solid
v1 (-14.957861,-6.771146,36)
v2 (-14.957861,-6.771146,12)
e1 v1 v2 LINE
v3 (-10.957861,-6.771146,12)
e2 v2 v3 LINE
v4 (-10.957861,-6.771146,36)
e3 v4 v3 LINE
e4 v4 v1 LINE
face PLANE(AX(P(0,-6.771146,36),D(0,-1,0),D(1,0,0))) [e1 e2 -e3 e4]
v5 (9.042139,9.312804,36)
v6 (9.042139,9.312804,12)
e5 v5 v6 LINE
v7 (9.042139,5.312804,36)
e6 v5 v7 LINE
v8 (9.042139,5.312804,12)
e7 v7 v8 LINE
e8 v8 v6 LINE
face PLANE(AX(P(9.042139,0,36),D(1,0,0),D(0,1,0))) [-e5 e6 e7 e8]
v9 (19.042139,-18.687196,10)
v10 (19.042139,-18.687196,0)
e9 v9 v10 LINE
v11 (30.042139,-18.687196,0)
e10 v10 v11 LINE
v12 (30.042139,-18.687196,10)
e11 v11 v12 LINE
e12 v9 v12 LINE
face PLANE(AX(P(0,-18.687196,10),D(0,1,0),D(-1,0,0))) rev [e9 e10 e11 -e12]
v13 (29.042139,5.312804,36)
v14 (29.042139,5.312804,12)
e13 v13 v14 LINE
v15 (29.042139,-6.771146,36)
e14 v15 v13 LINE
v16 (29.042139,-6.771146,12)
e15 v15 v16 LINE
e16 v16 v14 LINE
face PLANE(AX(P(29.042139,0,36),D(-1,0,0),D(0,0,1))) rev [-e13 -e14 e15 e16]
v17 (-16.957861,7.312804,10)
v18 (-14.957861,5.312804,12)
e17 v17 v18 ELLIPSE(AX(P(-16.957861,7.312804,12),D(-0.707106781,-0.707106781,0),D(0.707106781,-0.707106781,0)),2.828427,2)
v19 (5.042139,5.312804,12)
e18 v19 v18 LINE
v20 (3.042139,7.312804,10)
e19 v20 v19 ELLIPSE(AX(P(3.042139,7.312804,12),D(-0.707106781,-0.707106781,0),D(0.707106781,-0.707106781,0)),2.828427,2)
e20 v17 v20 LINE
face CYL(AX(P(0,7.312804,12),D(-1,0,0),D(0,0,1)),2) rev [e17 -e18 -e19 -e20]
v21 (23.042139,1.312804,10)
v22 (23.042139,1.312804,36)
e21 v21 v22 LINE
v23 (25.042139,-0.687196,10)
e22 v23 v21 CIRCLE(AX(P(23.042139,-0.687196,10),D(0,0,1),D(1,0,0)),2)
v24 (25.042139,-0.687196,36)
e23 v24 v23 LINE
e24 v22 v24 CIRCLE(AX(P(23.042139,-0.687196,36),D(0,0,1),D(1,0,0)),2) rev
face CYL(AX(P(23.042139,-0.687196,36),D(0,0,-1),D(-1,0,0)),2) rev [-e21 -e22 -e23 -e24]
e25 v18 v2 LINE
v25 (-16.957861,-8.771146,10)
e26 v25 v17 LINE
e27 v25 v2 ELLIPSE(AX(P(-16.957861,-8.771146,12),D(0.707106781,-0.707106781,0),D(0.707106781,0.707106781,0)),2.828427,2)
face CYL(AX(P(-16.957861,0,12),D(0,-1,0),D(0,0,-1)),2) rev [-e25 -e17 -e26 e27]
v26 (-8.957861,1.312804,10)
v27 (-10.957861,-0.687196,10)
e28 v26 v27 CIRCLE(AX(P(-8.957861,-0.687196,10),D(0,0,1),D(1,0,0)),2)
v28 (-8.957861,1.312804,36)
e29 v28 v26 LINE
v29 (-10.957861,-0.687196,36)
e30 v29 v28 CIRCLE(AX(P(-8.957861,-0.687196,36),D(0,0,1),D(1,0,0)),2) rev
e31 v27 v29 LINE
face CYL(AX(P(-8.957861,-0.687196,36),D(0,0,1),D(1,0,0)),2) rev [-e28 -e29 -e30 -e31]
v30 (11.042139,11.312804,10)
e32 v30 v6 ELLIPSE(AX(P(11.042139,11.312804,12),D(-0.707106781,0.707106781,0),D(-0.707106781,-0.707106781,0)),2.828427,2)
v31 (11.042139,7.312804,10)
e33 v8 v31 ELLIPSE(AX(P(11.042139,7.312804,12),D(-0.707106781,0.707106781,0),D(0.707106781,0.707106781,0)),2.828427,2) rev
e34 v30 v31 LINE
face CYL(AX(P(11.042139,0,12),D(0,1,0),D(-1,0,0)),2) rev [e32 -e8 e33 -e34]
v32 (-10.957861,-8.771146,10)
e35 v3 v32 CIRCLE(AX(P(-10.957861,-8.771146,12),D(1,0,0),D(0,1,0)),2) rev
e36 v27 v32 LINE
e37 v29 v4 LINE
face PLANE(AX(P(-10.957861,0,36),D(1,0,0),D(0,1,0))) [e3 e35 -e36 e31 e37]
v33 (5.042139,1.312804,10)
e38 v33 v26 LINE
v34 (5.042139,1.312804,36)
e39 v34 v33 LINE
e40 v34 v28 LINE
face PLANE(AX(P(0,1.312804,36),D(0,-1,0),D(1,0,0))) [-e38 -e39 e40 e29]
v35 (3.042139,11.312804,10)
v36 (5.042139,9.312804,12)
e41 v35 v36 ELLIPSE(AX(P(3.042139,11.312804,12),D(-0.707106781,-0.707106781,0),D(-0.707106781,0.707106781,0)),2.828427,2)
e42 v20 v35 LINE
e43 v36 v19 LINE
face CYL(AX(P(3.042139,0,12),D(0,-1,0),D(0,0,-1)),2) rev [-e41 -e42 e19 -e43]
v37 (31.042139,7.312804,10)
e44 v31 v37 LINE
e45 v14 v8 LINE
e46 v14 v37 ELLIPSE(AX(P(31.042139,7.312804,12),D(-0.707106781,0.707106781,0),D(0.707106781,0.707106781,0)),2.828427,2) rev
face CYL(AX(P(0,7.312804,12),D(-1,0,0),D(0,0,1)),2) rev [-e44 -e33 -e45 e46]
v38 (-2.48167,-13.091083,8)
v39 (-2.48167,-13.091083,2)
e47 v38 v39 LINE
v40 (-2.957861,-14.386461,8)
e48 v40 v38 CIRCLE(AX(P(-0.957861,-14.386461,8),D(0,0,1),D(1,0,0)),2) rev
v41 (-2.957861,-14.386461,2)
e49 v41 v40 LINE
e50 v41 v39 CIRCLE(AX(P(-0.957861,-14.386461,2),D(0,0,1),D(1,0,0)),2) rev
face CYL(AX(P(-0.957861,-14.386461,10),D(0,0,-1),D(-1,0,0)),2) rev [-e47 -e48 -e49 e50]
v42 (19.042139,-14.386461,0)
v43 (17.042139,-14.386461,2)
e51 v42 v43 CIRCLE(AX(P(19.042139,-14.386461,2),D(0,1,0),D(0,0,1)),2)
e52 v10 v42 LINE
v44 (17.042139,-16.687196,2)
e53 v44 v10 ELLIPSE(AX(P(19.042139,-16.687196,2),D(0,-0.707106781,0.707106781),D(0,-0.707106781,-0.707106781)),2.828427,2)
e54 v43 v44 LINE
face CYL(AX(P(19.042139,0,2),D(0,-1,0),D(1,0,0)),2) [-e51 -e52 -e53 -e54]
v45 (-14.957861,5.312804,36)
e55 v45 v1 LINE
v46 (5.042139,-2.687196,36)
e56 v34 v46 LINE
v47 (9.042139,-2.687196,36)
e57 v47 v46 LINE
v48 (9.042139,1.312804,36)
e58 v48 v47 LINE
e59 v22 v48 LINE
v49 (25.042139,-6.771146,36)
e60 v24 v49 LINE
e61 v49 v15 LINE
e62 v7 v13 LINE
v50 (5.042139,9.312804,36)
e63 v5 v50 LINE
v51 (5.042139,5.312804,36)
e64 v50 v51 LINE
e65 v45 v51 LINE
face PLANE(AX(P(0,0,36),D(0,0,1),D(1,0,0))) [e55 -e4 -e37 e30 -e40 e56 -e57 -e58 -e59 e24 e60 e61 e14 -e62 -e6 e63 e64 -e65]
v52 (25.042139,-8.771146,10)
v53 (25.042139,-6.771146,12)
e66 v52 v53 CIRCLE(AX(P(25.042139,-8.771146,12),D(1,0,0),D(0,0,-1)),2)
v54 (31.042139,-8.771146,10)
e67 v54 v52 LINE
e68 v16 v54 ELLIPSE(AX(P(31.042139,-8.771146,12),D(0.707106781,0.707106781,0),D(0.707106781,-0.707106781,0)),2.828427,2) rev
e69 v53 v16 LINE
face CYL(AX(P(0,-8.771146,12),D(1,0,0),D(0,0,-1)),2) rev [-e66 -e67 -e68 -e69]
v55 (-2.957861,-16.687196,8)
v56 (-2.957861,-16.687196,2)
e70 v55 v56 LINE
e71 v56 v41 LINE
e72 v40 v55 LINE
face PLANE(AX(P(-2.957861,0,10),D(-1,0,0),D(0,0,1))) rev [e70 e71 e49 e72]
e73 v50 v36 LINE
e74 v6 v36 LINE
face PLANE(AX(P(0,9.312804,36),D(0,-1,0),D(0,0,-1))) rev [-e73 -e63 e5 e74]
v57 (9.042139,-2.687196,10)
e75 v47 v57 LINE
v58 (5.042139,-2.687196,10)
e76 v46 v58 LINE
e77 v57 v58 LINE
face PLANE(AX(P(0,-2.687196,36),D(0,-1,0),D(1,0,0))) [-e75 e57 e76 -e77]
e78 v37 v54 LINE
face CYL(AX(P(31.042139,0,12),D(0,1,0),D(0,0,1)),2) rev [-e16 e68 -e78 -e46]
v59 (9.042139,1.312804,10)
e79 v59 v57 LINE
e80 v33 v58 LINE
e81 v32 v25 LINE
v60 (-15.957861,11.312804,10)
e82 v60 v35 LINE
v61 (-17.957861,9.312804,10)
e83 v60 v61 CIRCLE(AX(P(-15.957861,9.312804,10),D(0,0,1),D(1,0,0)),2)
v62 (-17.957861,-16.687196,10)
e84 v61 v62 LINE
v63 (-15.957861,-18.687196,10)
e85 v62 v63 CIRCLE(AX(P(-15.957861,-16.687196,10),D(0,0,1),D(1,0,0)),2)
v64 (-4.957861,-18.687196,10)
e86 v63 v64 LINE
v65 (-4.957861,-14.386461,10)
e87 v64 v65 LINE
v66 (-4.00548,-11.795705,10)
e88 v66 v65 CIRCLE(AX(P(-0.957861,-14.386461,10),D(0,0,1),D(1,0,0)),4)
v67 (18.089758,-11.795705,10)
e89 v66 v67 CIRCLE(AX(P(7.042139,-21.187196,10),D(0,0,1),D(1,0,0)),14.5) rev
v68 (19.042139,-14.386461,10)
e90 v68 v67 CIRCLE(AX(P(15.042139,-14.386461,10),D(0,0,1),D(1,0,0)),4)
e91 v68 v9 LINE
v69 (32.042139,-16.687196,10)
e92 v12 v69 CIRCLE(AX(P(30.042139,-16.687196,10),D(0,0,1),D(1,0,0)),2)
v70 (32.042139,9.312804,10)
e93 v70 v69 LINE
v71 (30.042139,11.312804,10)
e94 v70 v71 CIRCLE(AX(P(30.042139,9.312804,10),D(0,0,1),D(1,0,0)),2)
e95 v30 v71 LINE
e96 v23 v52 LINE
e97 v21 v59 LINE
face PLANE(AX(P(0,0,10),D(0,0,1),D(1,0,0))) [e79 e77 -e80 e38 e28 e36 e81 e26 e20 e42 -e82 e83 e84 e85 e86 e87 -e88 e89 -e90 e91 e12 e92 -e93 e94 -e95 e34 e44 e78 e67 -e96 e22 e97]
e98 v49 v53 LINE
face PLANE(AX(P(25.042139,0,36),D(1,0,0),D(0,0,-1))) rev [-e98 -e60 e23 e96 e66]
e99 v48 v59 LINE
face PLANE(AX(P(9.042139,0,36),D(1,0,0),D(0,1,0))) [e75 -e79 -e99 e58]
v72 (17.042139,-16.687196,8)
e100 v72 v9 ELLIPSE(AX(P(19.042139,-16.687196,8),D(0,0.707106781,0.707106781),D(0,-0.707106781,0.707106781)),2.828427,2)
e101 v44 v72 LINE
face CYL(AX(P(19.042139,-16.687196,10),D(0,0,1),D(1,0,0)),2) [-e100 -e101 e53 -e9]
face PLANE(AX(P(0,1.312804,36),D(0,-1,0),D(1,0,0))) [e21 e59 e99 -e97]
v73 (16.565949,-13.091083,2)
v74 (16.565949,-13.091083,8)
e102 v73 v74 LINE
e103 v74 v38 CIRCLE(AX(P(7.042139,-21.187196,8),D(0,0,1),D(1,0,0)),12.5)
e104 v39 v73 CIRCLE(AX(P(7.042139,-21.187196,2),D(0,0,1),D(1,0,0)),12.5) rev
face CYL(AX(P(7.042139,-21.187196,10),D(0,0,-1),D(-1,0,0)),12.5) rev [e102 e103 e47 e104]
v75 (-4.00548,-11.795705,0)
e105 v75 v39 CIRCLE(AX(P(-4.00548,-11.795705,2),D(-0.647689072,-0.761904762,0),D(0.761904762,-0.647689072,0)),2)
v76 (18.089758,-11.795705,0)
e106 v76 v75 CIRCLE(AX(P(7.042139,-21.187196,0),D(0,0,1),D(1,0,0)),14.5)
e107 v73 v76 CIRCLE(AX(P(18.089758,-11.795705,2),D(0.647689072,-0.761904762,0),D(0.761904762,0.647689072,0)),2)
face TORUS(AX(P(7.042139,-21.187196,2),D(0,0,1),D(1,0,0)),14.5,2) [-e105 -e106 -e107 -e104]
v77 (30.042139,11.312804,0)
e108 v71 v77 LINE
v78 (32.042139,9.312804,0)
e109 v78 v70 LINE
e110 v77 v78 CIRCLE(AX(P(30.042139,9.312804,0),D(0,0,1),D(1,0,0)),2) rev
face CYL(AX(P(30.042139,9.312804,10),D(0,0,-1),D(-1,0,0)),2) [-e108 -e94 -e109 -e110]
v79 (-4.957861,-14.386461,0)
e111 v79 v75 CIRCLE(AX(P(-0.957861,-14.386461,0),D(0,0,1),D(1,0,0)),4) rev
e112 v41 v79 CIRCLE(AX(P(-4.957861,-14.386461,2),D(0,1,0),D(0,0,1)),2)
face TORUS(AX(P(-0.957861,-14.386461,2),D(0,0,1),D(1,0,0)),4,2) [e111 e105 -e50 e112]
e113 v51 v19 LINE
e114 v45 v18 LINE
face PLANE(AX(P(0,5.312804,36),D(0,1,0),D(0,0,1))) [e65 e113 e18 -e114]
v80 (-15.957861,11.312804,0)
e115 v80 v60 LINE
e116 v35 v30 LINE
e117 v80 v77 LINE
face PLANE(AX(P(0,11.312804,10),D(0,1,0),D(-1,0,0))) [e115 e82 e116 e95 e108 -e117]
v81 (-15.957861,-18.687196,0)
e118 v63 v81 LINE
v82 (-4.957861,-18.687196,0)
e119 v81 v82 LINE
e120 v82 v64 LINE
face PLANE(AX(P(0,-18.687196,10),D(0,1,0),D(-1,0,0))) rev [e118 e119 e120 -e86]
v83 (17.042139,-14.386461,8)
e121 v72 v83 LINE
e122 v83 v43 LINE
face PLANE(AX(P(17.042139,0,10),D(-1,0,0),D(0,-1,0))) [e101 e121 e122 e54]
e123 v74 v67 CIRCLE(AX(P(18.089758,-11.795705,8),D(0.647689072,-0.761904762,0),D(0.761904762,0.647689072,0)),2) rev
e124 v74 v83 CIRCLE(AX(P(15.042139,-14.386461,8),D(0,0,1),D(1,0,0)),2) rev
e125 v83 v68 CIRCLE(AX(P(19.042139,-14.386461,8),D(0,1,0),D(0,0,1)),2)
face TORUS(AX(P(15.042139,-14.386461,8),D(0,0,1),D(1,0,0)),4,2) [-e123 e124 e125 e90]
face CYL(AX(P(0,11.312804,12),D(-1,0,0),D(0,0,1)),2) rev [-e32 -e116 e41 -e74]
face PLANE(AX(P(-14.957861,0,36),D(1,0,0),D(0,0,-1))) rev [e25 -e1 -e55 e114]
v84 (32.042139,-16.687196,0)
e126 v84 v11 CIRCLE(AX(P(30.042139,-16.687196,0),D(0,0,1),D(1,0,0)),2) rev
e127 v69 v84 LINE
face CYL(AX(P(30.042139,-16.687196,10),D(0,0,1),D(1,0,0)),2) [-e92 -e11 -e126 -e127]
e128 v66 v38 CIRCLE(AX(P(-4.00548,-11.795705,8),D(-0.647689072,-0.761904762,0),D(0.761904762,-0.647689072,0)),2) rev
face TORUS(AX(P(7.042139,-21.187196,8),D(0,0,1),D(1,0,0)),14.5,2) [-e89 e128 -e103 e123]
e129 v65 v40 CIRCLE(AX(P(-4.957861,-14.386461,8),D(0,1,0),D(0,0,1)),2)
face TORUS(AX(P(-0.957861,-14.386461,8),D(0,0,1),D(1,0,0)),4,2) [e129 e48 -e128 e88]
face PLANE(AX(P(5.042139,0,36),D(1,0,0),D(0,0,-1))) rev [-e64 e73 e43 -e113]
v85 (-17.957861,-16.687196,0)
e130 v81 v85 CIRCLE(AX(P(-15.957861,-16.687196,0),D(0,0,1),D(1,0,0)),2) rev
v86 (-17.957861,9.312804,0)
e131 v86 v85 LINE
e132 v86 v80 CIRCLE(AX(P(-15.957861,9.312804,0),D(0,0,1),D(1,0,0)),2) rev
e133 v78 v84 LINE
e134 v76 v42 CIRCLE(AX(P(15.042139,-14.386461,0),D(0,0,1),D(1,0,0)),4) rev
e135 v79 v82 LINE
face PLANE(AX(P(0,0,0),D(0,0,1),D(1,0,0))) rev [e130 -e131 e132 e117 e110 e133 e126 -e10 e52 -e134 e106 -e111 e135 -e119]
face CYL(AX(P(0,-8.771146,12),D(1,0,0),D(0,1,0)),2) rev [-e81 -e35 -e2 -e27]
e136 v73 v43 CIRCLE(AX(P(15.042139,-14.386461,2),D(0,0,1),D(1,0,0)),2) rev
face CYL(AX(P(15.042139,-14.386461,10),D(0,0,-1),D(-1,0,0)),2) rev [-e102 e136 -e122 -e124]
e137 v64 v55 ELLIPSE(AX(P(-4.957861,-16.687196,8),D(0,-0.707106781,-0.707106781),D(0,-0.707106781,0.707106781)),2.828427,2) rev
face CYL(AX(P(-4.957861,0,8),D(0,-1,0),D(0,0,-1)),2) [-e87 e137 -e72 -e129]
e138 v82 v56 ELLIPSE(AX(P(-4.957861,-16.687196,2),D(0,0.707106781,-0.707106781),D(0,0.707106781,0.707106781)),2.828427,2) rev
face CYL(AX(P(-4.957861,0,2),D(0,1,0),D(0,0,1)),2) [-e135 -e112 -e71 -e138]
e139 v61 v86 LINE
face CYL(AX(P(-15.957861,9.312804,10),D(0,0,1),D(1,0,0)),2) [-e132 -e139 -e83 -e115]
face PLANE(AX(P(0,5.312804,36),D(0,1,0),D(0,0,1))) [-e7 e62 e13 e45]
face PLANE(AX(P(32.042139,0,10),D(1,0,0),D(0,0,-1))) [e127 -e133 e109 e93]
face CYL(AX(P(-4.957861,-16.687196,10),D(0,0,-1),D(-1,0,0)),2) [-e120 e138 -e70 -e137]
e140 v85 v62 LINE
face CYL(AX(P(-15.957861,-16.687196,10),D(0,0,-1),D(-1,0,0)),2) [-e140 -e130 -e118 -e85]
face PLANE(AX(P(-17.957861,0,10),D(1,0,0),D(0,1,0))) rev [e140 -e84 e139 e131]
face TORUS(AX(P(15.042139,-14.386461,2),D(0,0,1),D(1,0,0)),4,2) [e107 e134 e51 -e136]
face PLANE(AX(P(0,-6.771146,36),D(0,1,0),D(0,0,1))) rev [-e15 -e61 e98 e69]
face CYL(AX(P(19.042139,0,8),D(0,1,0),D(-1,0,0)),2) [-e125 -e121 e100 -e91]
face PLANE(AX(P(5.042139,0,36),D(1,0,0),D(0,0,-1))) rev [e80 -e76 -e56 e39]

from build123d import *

# Parameters (mm, degrees)
RESSALTO_EXTRUS_O1_DEPTH = 10
FILETE1_R                = 2
FILETE2_R                = 2
RESSALTO_EXTRUS_O2_DEPTH = 26
FILETE4_R                = 2
FILETE6_R                = 2


with BuildPart() as part:
    # Esboço1 → Ressalto-extrusão1 (new body)
    with BuildSketch(Plane.XY):
        Polygon((-17.957860615883305, -18.6871961102107), (-2.9578606158833054, -18.687196110210696), (-2.957860615883306, -13.687196110210696), (-2.957860615883306, -8.687196110210698), (7.042139384116819, -8.687196110210696), (7.042139384116693, 11.312803889789302), (-17.95786061588331, 11.312803889789302), align=None)
        with BuildLine():
            Line((-2.957860615883306, -8.687196110210698), (-2.957860615883306, -13.687196110210696))
            ThreePointArc((-2.9578606158833054, -13.687196110210696), (1.451969440367277, -10.006856222711722), (7.042139384116818, -8.6871961102107))
            Line((7.042139384116819, -8.687196110210696), (-2.957860615883306, -8.687196110210698))
        make_face()
        Polygon((7.042139384116693, 11.312803889789302), (7.0421393841166955, -8.687196110210698), (17.042139384116695, -8.687196110210696), (17.042139384116698, -13.687196110210698), (17.042139384116698, -18.687196110210696), (32.042139384116695, -18.687196110210692), (32.042139384116695, 11.31280388978931), align=None)
        with BuildLine():
            Line((17.042139384116695, -8.687196110210696), (7.042139384116819, -8.687196110210696))
            ThreePointArc((7.042139384116818, -8.6871961102107), (12.632309327866226, -10.006856222711777), (17.0421393841167, -13.687196110210698))
            Line((17.042139384116698, -13.687196110210698), (17.042139384116695, -8.687196110210696))
        make_face()
    extrude(amount=RESSALTO_EXTRUS_O1_DEPTH)

    # Filete1
    filete1_edges = [part.edges().sort_by_distance(p)[0] for p in [
        (17.042139384116695, -16.187196110210696, 10),
        (17.042139384116695, -16.187196110210696, 0),
        (7.042139384116695, -8.6871961102107, 0),
        (-2.9578606158833054, -13.687196110210696, 5),
        (-2.9578606158833054, -18.6871961102107, 5),
        (17.042139384116695, -18.687196110210696, 5),
        (17.0421393841167, -13.687196110210698, 5),
        (-2.9578606158833054, -16.1871961102107, 10),
        (7.042139384116694, -8.6871961102107, 10),
        (-2.9578606158833054, -16.1871961102107, 0),
    ]]
    fillet(filete1_edges, radius=FILETE1_R)

    # Filete2
    filete2_edges = [part.edges().sort_by_distance(p)[0] for p in [
        (-17.957860615883305, -18.6871961102107, 5),
        (-17.95786061588331, 11.312803889789302, 5),
        (32.042139384116695, 11.31280388978931, 5),
        (32.042139384116695, -18.687196110210692, 5),
    ]]
    fillet(filete2_edges, radius=FILETE2_R)

    # Esboço2 → Ressalto-extrusão2 (add)
    with BuildSketch(Plane.XY.offset(10)):
        Polygon((9.042139384116691, 9.312803889789297), (5.042139384116695, 9.312803889789297), (5.042139384116695, 5.312803889789297), (-14.957860615883307, 5.312803889789293), (-14.957860615883302, -6.771146492865117), (-10.957860615883302, -6.771146492865116), (-10.957860615883309, 1.312803889789298), (5.042139384116695, 1.3128038897893), (5.042139384116695, -2.6871961102106985), (9.042139384116695, -2.687196110210697), (9.042139384116693, 1.3128038897892964), (25.04213938411669, 1.3128038897893024), (25.042139384116695, -6.771146492865112), (29.042139384116695, -6.771146492865111), (29.042139384116695, 5.312803889789296), (9.042139384116693, 5.312803889789297), align=None)
    extrude(amount=RESSALTO_EXTRUS_O2_DEPTH)

    # Filete4
    filete4_edges = [part.edges().sort_by_distance(p)[0] for p in [
        (-10.957860615883309, 1.312803889789298, 23),
        (25.042139384116695, 1.3128038897893024, 23),
    ]]
    fillet(filete4_edges, radius=FILETE4_R)

    # Filete6
    filete6_edges = [part.edges().sort_by_distance(p)[0] for p in [
        (-14.957860615883305, -0.729171301537912, 10),
        (27.042139384116695, -6.771146492865111, 10),
        (29.042139384116695, -0.7291713015379075, 10),
        (7.042139384116693, 9.312803889789297, 10),
        (5.042139384116695, 7.312803889789297, 10),
        (-4.957860615883305, 5.312803889789295, 10),
        (9.042139384116691, 7.312803889789297, 10),
        (19.042139384116695, 5.312803889789297, 10),
        (-12.957860615883302, -6.771146492865116, 10),
    ]]
    fillet(filete6_edges, radius=FILETE6_R - 0.0001)  # a hair under: the kernel refuses the full size


solid = part.part
